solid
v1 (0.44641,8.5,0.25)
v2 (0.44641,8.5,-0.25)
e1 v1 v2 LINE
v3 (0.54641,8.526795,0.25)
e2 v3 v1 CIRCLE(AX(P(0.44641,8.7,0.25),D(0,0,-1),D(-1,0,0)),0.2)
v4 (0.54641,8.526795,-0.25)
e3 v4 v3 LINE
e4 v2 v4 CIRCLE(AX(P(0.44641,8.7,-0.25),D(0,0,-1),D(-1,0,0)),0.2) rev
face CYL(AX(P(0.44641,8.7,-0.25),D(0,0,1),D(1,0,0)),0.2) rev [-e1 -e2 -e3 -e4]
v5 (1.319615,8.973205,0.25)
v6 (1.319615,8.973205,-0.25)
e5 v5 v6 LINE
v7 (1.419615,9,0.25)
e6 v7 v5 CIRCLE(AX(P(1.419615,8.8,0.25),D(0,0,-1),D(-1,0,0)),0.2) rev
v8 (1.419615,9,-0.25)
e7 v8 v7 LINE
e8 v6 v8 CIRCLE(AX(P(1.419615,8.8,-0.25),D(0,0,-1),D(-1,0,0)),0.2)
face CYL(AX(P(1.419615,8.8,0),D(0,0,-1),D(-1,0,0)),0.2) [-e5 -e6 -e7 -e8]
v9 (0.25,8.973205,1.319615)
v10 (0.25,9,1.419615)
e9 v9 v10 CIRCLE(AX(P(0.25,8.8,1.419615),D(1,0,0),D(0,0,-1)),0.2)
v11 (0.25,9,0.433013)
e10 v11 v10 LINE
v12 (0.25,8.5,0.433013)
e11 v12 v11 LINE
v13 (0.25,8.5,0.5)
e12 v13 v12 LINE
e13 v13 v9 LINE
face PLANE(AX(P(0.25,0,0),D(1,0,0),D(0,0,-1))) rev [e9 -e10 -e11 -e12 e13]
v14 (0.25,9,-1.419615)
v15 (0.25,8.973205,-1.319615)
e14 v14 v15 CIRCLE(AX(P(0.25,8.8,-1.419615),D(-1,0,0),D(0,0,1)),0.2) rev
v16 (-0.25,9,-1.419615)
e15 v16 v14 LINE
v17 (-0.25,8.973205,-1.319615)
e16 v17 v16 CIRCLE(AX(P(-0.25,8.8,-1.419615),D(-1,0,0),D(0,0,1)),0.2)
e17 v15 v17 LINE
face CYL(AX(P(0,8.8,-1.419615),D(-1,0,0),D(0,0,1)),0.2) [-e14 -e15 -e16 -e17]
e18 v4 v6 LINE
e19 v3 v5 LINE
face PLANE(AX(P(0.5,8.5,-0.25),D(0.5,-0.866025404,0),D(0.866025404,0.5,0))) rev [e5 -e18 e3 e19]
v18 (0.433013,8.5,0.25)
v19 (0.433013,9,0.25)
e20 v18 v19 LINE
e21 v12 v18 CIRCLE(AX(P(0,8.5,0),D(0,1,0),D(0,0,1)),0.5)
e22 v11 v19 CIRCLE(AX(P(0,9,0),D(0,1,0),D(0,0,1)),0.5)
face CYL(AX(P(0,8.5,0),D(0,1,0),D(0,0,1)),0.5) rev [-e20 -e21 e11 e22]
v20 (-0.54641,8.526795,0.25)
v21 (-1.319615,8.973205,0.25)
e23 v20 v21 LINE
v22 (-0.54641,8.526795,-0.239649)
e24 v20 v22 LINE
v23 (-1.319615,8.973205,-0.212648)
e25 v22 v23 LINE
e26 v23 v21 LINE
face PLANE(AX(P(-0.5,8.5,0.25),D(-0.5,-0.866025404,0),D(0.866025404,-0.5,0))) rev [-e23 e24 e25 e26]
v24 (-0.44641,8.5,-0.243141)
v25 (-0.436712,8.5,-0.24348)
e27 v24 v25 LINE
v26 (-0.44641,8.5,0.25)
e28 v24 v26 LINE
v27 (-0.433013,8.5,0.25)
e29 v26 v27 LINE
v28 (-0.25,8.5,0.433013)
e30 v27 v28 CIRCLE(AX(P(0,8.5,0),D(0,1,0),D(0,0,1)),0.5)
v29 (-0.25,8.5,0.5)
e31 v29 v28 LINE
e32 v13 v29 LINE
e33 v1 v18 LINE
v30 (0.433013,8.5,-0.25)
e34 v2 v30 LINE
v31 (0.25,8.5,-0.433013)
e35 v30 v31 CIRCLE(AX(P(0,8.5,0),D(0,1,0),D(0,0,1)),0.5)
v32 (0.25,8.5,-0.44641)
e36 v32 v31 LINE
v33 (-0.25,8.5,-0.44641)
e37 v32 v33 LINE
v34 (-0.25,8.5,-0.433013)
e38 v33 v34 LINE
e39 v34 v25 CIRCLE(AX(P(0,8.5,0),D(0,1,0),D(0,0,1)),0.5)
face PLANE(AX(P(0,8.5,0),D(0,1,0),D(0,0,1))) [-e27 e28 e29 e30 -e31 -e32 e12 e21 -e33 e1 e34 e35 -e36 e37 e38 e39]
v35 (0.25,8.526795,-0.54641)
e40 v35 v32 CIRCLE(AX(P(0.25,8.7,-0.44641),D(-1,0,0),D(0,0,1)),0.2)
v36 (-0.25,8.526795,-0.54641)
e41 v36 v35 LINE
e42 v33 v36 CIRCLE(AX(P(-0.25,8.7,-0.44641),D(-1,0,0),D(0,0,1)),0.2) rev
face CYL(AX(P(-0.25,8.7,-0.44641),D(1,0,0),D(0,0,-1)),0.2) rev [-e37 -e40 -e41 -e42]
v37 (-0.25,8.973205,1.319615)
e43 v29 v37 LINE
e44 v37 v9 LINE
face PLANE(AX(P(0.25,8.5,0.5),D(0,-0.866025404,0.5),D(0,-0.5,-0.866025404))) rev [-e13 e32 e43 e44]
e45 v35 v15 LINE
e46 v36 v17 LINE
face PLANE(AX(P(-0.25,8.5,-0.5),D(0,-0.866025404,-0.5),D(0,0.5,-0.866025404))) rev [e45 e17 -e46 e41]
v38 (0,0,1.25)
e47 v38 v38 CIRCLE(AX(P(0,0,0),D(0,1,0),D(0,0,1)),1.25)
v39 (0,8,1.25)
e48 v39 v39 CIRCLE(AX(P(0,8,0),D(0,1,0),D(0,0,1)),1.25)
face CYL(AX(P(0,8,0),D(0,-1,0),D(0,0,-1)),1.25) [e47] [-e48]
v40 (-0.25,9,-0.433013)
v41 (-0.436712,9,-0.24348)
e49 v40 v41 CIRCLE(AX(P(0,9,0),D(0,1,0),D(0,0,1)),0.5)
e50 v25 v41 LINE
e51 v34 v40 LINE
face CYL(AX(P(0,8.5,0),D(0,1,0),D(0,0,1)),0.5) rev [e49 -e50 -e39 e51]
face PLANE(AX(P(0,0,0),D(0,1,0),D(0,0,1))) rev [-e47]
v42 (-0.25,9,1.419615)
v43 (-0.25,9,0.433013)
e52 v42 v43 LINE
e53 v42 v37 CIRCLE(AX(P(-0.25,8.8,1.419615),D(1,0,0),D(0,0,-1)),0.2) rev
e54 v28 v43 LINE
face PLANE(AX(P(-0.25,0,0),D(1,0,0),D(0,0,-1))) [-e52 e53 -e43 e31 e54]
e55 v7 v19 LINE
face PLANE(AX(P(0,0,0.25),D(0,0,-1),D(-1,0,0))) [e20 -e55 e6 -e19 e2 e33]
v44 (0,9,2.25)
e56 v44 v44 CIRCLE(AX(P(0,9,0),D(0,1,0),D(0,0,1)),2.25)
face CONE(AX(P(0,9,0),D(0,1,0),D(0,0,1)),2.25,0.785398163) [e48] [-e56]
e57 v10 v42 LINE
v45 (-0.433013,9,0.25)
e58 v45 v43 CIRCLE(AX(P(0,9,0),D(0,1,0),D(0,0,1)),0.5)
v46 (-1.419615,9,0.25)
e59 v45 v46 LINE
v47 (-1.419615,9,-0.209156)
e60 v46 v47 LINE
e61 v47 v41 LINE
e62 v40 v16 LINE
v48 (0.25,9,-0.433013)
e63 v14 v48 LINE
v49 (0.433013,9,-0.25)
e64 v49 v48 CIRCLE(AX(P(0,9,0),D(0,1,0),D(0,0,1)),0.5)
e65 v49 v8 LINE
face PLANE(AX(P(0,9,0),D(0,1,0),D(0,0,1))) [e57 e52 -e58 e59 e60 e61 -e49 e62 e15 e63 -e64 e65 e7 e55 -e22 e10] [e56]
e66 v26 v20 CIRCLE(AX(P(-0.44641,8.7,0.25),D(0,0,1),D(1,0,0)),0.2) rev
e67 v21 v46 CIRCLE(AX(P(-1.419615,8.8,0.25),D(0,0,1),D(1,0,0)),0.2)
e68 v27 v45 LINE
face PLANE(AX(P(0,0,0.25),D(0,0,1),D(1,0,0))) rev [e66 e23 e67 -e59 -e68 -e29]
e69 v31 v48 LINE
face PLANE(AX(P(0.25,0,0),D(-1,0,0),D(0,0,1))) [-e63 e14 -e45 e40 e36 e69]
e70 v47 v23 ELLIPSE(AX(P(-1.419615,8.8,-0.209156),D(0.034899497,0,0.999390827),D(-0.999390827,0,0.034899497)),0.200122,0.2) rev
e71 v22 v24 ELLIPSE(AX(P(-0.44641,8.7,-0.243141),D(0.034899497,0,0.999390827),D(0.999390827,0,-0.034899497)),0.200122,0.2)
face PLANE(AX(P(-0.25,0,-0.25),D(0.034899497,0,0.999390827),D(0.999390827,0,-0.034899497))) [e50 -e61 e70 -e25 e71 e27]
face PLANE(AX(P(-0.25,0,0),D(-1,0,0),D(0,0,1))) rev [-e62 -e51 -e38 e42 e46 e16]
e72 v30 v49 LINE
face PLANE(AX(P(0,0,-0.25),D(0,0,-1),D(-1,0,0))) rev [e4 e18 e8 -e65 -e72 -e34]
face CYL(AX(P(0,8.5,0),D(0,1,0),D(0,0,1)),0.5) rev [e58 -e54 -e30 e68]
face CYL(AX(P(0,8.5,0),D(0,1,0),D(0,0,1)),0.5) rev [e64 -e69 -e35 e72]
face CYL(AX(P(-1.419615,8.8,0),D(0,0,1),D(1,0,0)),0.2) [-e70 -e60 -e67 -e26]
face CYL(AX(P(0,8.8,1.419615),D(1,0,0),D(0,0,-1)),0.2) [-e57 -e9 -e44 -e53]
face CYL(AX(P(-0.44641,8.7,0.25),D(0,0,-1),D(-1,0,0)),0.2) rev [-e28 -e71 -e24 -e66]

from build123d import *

# Parameters (mm, degrees)
SKETCH1_R           = 1.25
BOSS_EXTRUDE1_DEPTH = 8
SKETCH3_R           = 2.25
BOSS_EXTRUDE2_DEPTH = 1
CHAMFER3_SIZE       = 1
SKETCH4_R           = 0.5
CUT_EXTRUDE1_DEPTH  = 0.5
CUT_EXTRUDE2_DEPTH  = 0.25
CIRPATTERN1_COUNT   = 4
DRAFT1_ANGLE        = 2
FILLET4_R           = 0.2


with BuildPart() as part:
    # Sketch1 → Boss-Extrude1 (new body)
    with BuildSketch(Plane(origin=(0, 0, 0), x_dir=(1, 0, 0), z_dir=(0, 1, 0))):
        with Locations(Location((0, 0, 0), (0, 0, 270))):
            Circle(SKETCH1_R)
    extrude(amount=BOSS_EXTRUDE1_DEPTH)

    # Sketch3 → Boss-Extrude2 (add)
    with BuildSketch(Plane(origin=(0, 8, 0), x_dir=(1, 0, 0), z_dir=(0, 1, 0))):
        with Locations(Location((0, 0, 0), (0, 0, 270))):
            Circle(SKETCH3_R)
    extrude(amount=BOSS_EXTRUDE2_DEPTH)

    # Chamfer3
    chamfer3_edges = [part.edges().sort_by_distance(p)[0] for p in [
        (0, 8, -2.25),
    ]]
    chamfer(chamfer3_edges, length=CHAMFER3_SIZE - 0.0001)  # a hair under: the kernel refuses the full size

    # Sketch4 → Cut-Extrude1 (cut)
    with BuildSketch(Plane(origin=(0, 9, 0), x_dir=(1, 0, 0), z_dir=(0, 1, 0))):
        with Locations(Location((0, 0, 0), (0, 0, 270))):
            Circle(SKETCH4_R)
    extrude(amount=-CUT_EXTRUDE1_DEPTH, mode=Mode.SUBTRACT)

    # Sketch5 → Cut-Extrude2 (cut, symmetric)
    with BuildSketch(Plane.XY):
        Polygon((0.5, 8.5), (1.366025404, 9), (0.5, 9), (0.25, 9), (0.25, 8.5), align=None)
    cut_extrude2 = extrude(amount=CUT_EXTRUDE2_DEPTH, both=True, mode=Mode.SUBTRACT)

    # CirPattern1: Cut-Extrude2 ×4 about axis
    cirpattern1_axis = Axis((0, 0, 0), (0, 1, 0))
    for i in range(1, CIRPATTERN1_COUNT):
        add(cut_extrude2.rotate(cirpattern1_axis, i * 360 / CIRPATTERN1_COUNT), mode=Mode.SUBTRACT)

    # Draft1
    draft1_faces = [part.faces().sort_by_distance(p)[0] for p in [
        (-0.745512702, 8.822168784, -0.25),
    ]]
    draft(draft1_faces, Plane(origin=(-0.25, 0, 0), x_dir=(0, 0, 1), z_dir=(1, 0, 0)), DRAFT1_ANGLE)

    # Fillet4
    fillet4_edges = [part.edges().sort_by_distance(p)[0] for p in [
        (0.5, 8.5, 0),
        (1.366025404, 9, 0),
        (0, 8.5, -0.5),
        (0, 9, -1.366025404),
        (0, 9, 1.366025404),
        (-0.5, 8.5, 0.004365096),
        (-1.366025404, 9, 0.019486233),
    ]]
    fillet(fillet4_edges, radius=FILLET4_R)


solid = part.part
